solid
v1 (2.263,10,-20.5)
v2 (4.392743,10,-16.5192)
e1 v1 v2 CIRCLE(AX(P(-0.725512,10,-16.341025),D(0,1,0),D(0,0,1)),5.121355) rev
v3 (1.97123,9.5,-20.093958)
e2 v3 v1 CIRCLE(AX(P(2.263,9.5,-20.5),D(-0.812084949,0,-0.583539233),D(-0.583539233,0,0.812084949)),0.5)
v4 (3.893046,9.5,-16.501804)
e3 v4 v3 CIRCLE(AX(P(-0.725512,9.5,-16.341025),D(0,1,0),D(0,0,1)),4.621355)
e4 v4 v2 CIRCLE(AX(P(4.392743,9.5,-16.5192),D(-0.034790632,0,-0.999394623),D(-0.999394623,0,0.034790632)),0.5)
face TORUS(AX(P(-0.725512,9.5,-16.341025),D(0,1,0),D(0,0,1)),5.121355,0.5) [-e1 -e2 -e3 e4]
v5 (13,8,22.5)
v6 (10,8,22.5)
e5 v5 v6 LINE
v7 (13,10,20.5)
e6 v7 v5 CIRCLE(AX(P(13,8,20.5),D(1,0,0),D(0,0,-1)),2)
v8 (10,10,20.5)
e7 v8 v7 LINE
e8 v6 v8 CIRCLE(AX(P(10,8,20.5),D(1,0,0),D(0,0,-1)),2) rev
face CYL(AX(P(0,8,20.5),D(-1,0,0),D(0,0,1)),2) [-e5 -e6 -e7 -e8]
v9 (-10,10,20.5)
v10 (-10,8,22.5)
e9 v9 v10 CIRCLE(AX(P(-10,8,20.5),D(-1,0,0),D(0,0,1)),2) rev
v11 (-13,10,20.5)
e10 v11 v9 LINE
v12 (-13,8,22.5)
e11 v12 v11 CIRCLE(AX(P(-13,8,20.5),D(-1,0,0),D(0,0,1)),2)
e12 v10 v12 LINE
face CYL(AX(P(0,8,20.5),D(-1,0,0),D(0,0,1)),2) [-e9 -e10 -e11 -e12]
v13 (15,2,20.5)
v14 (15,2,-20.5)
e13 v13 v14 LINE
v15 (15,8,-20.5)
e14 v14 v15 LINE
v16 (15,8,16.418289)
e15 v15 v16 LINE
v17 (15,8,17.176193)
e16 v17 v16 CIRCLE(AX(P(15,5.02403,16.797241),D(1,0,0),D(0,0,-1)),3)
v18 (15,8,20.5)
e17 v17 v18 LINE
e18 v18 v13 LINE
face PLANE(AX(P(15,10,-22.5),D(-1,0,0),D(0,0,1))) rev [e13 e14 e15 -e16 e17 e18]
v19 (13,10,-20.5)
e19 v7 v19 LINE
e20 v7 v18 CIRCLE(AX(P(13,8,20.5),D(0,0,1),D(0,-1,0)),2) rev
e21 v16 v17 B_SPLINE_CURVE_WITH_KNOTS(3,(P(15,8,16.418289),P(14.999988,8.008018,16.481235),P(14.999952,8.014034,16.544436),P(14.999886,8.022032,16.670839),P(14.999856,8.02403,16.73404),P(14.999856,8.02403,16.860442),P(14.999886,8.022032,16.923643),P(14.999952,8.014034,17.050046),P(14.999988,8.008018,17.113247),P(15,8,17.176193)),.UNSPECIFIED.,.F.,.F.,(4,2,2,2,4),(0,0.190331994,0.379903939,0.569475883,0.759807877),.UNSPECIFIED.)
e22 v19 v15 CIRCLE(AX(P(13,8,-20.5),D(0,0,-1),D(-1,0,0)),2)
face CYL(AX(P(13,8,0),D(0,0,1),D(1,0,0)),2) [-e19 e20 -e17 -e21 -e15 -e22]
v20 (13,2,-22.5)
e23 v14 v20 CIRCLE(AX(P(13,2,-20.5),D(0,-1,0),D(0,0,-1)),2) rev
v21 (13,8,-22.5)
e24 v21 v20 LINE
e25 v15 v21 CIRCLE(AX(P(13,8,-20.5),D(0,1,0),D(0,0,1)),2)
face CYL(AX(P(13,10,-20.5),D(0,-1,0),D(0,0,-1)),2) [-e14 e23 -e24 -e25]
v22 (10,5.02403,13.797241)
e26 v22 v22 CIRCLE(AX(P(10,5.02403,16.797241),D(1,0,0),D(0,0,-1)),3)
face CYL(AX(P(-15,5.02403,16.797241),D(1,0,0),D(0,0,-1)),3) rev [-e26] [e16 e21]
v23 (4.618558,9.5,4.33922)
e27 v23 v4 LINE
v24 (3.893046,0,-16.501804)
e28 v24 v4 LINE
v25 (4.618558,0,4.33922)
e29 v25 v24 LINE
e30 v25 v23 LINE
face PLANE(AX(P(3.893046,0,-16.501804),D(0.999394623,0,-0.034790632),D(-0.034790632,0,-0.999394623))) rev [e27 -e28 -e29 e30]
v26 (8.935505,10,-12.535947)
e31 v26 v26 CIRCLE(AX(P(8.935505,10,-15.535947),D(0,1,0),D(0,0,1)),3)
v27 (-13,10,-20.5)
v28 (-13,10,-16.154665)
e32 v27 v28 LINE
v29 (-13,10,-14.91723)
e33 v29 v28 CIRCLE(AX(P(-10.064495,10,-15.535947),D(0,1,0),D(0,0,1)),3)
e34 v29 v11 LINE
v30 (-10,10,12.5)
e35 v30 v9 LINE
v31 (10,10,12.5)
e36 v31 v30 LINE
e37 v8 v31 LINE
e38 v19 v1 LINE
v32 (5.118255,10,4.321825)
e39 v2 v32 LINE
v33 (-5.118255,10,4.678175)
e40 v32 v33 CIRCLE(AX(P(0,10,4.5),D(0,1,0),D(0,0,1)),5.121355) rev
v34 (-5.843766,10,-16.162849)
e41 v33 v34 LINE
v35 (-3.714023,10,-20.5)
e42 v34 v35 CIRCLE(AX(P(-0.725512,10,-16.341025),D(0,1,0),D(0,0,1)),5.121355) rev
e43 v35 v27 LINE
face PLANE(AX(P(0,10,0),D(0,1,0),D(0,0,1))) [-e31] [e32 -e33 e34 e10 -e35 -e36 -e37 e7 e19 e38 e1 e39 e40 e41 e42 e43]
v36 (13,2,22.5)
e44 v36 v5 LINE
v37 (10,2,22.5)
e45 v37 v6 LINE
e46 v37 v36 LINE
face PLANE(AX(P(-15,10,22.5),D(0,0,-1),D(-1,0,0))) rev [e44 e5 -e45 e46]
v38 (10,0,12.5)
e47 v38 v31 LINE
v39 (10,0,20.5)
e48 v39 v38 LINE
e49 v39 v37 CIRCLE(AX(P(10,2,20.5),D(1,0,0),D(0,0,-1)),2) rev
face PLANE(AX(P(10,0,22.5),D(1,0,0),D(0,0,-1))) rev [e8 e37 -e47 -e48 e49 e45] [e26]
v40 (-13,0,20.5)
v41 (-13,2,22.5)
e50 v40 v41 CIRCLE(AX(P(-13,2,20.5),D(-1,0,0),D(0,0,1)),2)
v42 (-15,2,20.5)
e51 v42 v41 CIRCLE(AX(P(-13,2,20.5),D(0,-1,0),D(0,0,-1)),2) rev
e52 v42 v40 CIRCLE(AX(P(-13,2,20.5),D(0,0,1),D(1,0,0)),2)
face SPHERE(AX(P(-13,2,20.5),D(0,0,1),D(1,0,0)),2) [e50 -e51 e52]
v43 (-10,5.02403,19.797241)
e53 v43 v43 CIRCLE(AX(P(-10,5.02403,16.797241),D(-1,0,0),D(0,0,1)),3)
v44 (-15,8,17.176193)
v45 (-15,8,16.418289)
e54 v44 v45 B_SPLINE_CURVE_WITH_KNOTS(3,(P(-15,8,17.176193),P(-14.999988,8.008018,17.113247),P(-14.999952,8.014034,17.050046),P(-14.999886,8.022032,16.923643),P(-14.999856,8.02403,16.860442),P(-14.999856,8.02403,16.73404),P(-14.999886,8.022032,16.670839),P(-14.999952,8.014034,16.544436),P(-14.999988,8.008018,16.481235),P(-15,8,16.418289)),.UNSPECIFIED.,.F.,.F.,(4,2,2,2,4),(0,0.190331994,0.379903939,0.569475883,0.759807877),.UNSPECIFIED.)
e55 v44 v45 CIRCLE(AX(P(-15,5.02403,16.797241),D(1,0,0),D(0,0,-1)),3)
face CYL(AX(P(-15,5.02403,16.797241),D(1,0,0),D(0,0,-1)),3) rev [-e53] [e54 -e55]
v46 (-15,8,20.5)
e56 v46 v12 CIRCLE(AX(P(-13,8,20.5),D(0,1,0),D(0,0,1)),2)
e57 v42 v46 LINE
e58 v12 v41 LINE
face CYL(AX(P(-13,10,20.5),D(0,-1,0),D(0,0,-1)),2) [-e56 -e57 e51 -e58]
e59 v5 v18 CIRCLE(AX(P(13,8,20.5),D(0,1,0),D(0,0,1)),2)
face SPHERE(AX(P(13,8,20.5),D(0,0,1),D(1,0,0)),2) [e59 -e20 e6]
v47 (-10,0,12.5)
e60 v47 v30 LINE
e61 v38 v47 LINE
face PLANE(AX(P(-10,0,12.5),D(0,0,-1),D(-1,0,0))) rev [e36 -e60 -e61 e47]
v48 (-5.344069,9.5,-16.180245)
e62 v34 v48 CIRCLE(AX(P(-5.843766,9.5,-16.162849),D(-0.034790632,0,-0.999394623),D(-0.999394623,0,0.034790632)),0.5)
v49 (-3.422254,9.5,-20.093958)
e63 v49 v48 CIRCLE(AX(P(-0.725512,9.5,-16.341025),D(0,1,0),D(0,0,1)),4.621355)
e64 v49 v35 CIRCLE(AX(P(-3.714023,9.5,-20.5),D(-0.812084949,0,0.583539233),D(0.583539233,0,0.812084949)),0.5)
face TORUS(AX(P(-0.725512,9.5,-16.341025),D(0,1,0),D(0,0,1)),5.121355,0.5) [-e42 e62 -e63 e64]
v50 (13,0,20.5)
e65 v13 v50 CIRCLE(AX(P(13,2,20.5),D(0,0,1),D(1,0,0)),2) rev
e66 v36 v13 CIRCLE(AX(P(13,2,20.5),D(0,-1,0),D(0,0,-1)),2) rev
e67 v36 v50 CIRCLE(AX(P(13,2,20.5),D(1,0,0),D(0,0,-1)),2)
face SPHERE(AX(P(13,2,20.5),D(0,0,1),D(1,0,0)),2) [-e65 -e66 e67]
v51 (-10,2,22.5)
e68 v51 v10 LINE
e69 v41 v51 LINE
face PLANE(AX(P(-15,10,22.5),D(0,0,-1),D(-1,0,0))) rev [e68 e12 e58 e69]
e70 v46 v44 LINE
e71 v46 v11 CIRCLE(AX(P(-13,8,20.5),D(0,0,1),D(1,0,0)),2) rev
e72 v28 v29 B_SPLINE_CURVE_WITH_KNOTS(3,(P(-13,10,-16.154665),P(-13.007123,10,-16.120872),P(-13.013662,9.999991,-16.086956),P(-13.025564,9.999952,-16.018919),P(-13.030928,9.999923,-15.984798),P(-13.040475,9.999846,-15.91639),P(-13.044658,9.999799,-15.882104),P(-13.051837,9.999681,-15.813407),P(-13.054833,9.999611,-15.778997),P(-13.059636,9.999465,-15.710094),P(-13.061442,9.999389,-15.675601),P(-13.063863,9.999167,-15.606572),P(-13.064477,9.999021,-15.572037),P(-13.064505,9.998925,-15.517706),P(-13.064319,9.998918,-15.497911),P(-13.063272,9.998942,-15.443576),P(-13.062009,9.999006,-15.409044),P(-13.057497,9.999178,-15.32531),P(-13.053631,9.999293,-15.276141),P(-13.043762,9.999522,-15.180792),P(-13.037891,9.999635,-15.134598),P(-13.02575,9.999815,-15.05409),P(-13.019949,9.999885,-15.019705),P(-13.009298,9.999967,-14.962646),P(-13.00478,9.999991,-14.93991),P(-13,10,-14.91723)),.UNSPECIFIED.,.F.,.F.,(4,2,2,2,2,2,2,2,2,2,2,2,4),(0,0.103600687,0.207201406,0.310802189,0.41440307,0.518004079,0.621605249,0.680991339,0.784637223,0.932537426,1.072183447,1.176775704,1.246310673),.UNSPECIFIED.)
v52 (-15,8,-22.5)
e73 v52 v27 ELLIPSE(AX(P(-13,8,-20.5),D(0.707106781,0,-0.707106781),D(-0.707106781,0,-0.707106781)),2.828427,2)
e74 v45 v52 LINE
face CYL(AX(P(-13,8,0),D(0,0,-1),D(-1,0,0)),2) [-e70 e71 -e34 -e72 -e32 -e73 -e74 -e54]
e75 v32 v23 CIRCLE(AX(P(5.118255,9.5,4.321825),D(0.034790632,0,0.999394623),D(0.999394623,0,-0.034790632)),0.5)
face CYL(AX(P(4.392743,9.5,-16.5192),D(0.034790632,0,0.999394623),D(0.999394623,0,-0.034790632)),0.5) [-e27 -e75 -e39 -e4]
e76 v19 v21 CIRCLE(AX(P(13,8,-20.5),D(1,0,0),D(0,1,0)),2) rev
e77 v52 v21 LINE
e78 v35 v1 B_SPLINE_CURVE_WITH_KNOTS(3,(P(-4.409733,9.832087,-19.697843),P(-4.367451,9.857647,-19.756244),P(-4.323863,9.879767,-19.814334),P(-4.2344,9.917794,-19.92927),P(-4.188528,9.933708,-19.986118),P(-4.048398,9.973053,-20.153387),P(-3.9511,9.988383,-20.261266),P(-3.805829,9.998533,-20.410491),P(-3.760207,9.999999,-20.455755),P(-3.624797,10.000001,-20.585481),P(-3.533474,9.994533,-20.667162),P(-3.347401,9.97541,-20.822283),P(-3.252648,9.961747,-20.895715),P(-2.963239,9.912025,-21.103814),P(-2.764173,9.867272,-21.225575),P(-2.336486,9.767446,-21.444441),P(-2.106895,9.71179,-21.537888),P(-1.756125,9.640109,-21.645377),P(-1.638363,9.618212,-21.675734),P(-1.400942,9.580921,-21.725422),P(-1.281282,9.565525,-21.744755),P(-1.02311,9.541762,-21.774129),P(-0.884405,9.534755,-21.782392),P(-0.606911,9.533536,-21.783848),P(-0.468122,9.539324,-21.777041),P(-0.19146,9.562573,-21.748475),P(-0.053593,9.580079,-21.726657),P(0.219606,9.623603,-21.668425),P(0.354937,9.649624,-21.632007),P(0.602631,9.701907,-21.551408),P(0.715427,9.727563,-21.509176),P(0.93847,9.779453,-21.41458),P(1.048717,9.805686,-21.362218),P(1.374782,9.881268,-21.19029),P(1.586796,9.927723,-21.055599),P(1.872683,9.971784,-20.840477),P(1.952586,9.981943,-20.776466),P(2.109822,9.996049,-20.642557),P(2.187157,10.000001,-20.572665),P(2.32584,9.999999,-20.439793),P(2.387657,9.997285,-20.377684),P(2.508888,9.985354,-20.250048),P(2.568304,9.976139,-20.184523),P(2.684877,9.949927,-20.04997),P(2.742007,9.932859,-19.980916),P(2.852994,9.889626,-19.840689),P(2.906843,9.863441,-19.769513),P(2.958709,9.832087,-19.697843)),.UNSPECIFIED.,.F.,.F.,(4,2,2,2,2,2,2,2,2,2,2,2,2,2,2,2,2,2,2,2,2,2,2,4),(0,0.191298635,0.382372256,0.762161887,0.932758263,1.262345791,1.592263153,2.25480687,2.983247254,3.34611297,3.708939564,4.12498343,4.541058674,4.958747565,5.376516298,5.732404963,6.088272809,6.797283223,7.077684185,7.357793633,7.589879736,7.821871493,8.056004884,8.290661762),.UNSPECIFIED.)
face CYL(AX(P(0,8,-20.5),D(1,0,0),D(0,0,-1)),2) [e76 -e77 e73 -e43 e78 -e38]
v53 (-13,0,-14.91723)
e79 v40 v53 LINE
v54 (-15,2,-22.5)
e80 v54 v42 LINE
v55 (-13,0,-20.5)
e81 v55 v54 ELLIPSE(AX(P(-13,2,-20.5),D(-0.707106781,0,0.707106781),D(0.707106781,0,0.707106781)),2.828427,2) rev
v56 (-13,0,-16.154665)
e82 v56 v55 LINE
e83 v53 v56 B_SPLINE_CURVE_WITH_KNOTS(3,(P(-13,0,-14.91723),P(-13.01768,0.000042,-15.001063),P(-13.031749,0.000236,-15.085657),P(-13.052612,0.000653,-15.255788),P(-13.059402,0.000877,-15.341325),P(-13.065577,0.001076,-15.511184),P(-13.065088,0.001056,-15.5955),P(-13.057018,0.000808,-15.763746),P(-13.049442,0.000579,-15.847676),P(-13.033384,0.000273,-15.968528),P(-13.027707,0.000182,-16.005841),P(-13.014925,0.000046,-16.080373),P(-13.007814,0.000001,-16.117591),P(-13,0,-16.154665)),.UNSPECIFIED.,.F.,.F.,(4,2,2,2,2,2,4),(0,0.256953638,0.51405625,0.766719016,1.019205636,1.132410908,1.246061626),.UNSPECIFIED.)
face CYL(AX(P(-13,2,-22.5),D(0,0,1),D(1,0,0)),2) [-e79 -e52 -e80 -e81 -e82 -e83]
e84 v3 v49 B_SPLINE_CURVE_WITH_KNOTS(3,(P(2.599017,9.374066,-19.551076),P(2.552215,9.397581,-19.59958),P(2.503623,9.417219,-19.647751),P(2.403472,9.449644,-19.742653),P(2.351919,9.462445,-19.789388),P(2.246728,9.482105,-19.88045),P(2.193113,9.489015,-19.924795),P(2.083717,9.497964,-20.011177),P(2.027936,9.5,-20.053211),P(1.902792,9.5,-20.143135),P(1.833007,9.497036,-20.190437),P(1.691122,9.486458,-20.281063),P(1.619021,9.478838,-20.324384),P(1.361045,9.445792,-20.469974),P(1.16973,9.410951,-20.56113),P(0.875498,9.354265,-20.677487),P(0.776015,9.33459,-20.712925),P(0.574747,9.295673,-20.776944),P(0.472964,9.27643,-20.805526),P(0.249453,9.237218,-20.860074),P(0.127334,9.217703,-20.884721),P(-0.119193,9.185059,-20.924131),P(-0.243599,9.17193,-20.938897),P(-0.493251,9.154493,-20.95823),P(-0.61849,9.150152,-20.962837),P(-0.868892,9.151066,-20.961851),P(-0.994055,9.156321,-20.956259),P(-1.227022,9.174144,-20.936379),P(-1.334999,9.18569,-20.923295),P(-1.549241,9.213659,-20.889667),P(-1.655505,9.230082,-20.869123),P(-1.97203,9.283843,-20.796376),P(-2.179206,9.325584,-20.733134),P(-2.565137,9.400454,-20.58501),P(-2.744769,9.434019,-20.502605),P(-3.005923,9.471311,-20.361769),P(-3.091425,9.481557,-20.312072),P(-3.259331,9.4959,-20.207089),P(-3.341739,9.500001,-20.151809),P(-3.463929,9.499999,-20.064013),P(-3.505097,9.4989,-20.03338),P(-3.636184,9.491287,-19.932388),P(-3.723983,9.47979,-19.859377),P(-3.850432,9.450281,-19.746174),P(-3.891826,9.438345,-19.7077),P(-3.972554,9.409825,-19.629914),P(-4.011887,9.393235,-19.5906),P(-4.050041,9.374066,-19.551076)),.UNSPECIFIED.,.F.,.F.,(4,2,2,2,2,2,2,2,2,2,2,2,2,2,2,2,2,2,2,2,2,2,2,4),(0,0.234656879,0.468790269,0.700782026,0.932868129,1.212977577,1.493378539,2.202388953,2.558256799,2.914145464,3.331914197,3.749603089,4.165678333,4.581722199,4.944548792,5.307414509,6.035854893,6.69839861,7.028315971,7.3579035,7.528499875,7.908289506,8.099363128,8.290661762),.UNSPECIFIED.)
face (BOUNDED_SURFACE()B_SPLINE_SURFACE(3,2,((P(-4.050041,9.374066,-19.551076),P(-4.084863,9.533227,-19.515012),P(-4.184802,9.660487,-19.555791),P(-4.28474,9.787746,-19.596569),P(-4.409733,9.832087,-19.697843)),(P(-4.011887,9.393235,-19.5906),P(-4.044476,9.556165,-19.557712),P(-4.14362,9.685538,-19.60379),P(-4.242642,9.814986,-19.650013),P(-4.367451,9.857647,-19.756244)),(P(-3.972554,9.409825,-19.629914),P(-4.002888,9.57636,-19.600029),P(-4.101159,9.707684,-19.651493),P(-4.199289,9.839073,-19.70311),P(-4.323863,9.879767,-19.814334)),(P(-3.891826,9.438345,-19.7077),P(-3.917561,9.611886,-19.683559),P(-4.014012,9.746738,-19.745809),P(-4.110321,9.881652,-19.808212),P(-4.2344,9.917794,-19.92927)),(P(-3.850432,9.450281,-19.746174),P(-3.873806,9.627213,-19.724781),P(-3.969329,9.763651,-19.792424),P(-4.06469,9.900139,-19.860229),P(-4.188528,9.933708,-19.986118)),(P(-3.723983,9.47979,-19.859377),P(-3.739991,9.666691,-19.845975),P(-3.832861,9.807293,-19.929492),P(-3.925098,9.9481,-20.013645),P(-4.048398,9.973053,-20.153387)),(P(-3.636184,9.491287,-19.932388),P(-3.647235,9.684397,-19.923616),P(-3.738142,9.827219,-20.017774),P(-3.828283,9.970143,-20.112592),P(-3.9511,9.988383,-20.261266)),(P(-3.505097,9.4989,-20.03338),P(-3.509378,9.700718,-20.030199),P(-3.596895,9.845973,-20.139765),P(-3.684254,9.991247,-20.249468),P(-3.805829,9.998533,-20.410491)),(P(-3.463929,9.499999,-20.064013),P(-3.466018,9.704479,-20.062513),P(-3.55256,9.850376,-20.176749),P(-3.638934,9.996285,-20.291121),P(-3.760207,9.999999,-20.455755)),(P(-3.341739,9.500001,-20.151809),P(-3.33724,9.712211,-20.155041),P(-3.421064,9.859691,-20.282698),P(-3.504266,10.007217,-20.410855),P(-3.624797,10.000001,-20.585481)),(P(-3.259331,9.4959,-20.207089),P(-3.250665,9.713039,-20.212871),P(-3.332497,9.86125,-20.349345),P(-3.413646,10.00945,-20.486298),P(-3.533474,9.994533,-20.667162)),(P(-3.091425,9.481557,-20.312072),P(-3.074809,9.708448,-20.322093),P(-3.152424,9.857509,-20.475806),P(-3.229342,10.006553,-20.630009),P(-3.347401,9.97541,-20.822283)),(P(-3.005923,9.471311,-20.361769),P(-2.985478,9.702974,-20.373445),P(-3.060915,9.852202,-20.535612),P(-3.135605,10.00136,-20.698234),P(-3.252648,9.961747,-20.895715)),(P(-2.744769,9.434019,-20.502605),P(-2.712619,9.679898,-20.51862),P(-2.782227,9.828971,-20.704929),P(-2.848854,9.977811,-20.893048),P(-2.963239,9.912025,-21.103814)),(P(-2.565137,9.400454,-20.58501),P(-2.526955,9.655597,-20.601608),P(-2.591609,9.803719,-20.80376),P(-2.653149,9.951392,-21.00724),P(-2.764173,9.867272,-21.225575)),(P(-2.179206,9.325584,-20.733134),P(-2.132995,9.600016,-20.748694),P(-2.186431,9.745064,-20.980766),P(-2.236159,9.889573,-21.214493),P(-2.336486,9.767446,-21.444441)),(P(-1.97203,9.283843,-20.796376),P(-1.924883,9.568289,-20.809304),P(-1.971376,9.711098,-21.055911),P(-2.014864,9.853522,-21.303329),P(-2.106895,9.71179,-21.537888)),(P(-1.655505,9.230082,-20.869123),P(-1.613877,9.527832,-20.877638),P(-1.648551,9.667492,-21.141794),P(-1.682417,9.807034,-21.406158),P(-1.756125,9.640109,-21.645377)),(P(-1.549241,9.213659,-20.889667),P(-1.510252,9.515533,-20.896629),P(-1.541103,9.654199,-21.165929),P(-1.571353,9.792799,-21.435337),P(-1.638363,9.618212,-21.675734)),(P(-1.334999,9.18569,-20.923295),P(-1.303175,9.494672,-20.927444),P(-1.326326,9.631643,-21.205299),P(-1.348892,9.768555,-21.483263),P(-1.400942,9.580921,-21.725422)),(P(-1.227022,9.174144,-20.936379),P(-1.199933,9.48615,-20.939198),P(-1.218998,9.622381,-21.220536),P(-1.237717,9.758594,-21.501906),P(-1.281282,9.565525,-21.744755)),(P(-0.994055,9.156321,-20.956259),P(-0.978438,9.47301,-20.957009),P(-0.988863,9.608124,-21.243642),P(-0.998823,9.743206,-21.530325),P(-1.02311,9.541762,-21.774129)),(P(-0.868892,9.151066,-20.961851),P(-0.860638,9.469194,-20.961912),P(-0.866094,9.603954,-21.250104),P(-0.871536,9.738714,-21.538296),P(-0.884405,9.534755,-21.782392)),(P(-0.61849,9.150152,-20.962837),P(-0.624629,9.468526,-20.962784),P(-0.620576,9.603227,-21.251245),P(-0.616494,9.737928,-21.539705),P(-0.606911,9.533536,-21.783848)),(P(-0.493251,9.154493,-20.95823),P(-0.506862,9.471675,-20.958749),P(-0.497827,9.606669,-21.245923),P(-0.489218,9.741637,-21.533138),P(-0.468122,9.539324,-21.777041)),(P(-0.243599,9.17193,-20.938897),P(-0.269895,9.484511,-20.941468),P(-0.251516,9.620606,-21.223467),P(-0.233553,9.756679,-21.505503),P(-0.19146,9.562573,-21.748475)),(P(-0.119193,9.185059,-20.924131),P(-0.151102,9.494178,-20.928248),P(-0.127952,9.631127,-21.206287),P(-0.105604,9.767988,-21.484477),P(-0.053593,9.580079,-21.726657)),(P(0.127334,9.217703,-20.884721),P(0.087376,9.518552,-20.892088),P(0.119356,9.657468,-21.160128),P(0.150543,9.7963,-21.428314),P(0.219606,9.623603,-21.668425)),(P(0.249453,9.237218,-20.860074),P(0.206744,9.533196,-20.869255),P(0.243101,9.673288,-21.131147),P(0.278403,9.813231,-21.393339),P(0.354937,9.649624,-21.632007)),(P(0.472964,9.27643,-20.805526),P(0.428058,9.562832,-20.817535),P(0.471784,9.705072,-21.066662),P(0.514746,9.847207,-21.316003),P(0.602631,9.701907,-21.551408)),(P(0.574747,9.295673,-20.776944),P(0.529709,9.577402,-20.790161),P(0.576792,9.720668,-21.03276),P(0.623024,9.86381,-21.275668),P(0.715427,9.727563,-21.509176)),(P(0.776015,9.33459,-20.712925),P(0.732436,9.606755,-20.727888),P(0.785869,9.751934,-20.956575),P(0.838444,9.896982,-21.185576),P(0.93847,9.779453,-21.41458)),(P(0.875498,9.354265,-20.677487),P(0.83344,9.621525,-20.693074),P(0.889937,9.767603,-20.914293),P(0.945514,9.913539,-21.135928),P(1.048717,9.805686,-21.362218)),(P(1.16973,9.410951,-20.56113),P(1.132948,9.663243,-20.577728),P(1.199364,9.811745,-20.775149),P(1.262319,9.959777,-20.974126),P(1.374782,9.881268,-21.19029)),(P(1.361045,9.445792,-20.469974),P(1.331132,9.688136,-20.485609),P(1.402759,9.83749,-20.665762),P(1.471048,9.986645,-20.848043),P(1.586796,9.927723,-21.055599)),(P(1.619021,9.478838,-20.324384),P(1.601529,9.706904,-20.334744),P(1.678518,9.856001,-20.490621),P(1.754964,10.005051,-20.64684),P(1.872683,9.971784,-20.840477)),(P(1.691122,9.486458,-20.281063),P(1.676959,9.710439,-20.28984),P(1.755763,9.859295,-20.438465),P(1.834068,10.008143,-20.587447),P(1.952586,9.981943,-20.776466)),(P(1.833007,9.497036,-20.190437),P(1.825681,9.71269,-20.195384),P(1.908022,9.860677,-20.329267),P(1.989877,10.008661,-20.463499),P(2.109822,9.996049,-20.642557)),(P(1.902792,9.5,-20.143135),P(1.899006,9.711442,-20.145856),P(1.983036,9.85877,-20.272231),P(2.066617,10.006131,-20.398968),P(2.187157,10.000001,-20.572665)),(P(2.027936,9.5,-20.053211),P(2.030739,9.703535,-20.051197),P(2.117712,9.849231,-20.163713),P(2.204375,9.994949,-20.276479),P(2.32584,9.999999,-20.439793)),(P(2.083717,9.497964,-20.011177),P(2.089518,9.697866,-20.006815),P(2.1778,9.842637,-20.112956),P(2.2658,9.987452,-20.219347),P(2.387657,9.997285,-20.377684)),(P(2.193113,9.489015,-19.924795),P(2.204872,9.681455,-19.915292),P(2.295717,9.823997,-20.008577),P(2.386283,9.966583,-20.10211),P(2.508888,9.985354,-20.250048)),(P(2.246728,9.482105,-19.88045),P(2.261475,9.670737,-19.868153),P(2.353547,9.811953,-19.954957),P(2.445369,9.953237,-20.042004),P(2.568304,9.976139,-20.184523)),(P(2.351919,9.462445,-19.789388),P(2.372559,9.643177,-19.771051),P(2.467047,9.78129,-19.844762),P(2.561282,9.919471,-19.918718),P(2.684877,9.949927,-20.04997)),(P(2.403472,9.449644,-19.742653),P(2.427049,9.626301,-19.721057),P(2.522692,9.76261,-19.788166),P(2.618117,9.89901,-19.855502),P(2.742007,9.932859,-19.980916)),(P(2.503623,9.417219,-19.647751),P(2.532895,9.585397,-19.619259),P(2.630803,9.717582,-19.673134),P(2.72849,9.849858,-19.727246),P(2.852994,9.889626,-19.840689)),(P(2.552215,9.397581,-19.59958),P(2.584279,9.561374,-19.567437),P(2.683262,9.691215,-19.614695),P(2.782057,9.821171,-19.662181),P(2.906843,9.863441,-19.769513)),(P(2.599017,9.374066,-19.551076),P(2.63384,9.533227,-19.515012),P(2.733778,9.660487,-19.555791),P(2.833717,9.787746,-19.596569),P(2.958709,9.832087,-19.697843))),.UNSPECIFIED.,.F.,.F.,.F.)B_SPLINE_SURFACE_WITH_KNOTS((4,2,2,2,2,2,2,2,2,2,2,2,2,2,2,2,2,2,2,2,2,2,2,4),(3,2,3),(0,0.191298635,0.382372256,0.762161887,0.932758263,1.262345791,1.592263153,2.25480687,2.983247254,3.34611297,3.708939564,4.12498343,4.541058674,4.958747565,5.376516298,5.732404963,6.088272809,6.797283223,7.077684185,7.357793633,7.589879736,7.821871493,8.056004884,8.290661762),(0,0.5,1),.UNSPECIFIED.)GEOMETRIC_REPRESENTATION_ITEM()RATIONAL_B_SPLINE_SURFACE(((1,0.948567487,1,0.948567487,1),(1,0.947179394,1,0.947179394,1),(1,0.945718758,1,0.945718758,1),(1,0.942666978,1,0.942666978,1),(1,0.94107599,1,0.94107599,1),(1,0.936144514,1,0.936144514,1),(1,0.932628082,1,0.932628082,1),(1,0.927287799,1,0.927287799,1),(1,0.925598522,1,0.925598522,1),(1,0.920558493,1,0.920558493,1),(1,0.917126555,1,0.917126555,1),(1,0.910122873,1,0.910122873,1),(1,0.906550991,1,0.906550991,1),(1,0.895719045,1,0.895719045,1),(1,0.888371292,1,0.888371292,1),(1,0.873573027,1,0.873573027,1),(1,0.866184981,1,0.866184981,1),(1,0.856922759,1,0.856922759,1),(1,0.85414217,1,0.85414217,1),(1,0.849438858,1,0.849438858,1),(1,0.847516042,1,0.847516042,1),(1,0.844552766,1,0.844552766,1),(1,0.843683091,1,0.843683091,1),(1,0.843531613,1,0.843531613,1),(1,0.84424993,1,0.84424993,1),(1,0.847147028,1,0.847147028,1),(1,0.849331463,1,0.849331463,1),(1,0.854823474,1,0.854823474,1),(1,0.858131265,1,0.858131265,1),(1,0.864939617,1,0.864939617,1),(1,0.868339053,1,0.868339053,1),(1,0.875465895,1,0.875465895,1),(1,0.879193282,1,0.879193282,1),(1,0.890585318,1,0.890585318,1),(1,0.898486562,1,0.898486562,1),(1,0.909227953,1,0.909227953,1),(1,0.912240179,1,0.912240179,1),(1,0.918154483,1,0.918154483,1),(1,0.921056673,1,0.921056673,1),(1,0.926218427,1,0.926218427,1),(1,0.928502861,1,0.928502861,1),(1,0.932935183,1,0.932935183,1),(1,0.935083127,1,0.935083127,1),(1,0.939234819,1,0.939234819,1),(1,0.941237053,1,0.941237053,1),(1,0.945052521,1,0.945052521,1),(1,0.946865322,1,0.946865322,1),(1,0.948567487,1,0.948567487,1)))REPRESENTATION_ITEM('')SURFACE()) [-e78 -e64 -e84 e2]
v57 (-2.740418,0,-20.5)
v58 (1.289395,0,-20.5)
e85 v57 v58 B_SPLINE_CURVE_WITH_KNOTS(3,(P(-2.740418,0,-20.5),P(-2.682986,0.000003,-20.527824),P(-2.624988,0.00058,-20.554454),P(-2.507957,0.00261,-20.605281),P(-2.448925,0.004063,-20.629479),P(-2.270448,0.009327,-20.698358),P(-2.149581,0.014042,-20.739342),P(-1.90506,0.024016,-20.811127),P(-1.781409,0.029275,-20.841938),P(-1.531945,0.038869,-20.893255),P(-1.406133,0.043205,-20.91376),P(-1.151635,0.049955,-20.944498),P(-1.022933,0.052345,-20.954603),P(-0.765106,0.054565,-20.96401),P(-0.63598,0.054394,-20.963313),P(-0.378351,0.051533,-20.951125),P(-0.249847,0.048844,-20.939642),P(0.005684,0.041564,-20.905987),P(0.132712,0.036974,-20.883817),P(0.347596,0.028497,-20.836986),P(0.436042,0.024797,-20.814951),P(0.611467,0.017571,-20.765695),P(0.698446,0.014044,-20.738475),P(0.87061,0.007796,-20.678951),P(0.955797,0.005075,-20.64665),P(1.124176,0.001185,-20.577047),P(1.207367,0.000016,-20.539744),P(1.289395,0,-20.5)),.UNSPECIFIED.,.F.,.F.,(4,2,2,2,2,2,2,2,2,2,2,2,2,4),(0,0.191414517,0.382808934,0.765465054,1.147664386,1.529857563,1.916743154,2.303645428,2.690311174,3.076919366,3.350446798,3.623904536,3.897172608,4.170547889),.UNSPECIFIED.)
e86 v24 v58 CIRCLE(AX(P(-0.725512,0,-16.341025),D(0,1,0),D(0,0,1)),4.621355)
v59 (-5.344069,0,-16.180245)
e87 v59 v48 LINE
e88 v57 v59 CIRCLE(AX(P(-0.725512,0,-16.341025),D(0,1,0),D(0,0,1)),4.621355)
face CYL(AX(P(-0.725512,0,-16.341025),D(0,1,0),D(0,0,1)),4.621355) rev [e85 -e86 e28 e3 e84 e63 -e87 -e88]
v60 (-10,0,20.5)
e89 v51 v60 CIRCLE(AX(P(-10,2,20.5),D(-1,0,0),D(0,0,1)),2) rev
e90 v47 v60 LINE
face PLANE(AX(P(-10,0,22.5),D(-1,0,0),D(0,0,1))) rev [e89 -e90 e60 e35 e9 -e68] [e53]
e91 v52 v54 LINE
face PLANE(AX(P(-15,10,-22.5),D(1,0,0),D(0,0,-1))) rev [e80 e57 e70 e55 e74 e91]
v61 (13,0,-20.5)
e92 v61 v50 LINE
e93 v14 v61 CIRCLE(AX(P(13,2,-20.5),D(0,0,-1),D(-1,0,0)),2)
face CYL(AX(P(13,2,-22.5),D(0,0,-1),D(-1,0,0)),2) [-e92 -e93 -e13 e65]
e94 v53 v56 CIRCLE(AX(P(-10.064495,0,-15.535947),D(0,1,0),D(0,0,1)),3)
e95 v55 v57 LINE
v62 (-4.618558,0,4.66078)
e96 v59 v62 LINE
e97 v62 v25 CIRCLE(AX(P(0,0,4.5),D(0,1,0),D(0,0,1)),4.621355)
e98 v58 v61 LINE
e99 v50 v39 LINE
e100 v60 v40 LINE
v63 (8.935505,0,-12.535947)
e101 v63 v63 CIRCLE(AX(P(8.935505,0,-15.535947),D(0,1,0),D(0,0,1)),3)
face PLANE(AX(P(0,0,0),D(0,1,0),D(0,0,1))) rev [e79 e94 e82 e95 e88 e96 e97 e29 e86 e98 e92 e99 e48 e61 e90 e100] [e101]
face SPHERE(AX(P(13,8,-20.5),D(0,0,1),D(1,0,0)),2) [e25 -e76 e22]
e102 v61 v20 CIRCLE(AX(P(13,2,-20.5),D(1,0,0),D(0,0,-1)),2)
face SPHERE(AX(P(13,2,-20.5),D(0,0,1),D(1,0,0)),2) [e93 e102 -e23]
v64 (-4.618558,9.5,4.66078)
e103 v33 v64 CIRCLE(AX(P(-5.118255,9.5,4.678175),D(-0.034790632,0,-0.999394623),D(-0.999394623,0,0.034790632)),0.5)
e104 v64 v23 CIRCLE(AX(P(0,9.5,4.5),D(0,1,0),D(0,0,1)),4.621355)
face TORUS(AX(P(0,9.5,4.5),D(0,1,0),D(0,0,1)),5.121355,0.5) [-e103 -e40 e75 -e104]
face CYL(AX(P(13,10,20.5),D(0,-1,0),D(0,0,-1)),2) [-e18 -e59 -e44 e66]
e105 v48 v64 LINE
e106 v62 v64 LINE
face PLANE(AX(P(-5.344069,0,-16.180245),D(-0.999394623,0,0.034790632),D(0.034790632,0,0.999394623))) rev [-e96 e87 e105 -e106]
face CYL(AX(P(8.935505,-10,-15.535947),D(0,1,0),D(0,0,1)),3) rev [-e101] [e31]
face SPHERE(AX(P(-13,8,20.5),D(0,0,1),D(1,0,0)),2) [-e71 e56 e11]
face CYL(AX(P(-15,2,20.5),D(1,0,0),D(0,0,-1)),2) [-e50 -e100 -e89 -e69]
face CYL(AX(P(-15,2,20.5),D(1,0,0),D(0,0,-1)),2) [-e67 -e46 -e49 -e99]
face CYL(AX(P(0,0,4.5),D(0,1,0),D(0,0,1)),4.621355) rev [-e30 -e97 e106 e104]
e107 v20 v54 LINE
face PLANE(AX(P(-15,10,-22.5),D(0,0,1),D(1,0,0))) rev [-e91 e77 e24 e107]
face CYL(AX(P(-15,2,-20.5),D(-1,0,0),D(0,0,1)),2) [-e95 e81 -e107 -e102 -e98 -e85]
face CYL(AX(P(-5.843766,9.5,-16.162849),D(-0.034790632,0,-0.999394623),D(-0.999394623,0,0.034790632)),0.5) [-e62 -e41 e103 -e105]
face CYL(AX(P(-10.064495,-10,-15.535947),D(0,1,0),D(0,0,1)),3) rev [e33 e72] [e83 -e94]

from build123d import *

# Parameters (mm, degrees)
SKETCH1_W           = 30
SKETCH1_H           = 45
BOSS_EXTRUDE1_DEPTH = 10
SKETCH2_W           = 20
SKETCH2_H           = 10
CUT_EXTRUDE1_DEPTH  = 29.831406487
FILLET1_R           = 2
FILLET3_R           = 0.5
SKETCH3_R           = 3
CUT_EXTRUDE2_DEPTH  = 39.810436902
SKETCH4_R           = 3
CUT_EXTRUDE3_DEPTH  = 20


with BuildPart() as part:
    # Sketch1 → Boss-Extrude1 (new body)
    with BuildSketch(Plane(origin=(0, 0, 0), x_dir=(1, 0, 0), z_dir=(0, 1, 0))):
        Rectangle(SKETCH1_W, SKETCH1_H)
    extrude(amount=BOSS_EXTRUDE1_DEPTH)

    # Sketch2 → Cut-Extrude1 (cut, through all)
    with BuildSketch(Plane(origin=(0, 10, 0), x_dir=(1, 0, 0), z_dir=(0, 1, 0))):
        with BuildLine():
            Line((3.893045877, 16.501804419), (4.618557503, -4.339220132))
            ThreePointArc((4.618557503, -4.339220132), (0.160779868, -9.118557503), (-4.618557503, -4.660779868))
            Line((-4.618557503, -4.660779868), (-5.34406913, 16.180244684))
            ThreePointArc((-5.34406913, 16.180244684), (-0.886291494, 20.959582055), (3.893045877, 16.501804419))
        make_face()
        with Locations((0, -17.5)):
            Rectangle(SKETCH2_W, SKETCH2_H)
    extrude(amount=-CUT_EXTRUDE1_DEPTH, mode=Mode.SUBTRACT)

    # Fillet1
    # the kernel refuses this fillet: 2 mm, written as the material it takes off along each edge
    with BuildSketch(Plane(origin=(-13, 8, 20.5), x_dir=(0, 1, 0), z_dir=(-1, 0, 0))) as fillet1_piece_1_section:
        Polygon((0, 0), (FILLET1_R, 0), (FILLET1_R, -FILLET1_R), (0, -FILLET1_R), align=None)
    fillet1_piece_1 = extrude(amount=FILLET1_R, mode=Mode.PRIVATE)
    fillet1_piece_1 = fillet1_piece_1 - Plane(origin=(-13, 8, 20.5), x_dir=(0, -0.7071067811865475, -0.7071067811865475), z_dir=(-1, 0, 0)) * Sphere(FILLET1_R, mode=Mode.PRIVATE)
    add(fillet1_piece_1, mode=Mode.SUBTRACT)
    with BuildSketch(Plane(origin=(13, 2, 20.5), x_dir=(0, -1, 0), z_dir=(1, 0, 0))) as fillet1_piece_2_section:
        Polygon((0, 0), (FILLET1_R, 0), (FILLET1_R, -FILLET1_R), (0, -FILLET1_R), align=None)
    fillet1_piece_2 = extrude(amount=FILLET1_R, mode=Mode.PRIVATE)
    fillet1_piece_2 = fillet1_piece_2 - Plane(origin=(13, 2, 20.5), x_dir=(0, 0.7071067811865475, -0.7071067811865475), z_dir=(1, 0, 0)) * Sphere(FILLET1_R, mode=Mode.PRIVATE)
    add(fillet1_piece_2, mode=Mode.SUBTRACT)
    with BuildSketch(Plane(origin=(13, 8, 20.5), x_dir=(0, 1, 0), z_dir=(1, 0, 0))) as fillet1_piece_3_section:
        Polygon((0, 0), (FILLET1_R, 0), (FILLET1_R, FILLET1_R), (0, FILLET1_R), align=None)
    fillet1_piece_3 = extrude(amount=FILLET1_R, mode=Mode.PRIVATE)
    fillet1_piece_3 = fillet1_piece_3 - Plane(origin=(13, 8, 20.5), x_dir=(0, -0.7071067811865475, -0.7071067811865475), z_dir=(1, 0, 0)) * Sphere(FILLET1_R, mode=Mode.PRIVATE)
    add(fillet1_piece_3, mode=Mode.SUBTRACT)
    with BuildSketch(Plane(origin=(13, 8, -20.5), x_dir=(1, 0, 0), z_dir=(0, 0, -1))) as fillet1_piece_4_section:
        Polygon((0, 0), (FILLET1_R, 0), (FILLET1_R, -FILLET1_R), (0, -FILLET1_R), align=None)
    fillet1_piece_4 = extrude(amount=FILLET1_R, mode=Mode.PRIVATE)
    fillet1_piece_4 = fillet1_piece_4 - Plane(origin=(13, 8, -20.5), x_dir=(-0.7071067811865475, -0.7071067811865475, 0), z_dir=(0, 0, -1)) * Sphere(FILLET1_R, mode=Mode.PRIVATE)
    add(fillet1_piece_4, mode=Mode.SUBTRACT)
    with BuildSketch(Plane(origin=(-13, 2, 20.5), x_dir=(0, -1, 0), z_dir=(-1, 0, 0))) as fillet1_piece_5_section:
        Polygon((0, 0), (FILLET1_R, 0), (FILLET1_R, FILLET1_R), (0, FILLET1_R), align=None)
    fillet1_piece_5 = extrude(amount=FILLET1_R, mode=Mode.PRIVATE)
    fillet1_piece_5 = fillet1_piece_5 - Plane(origin=(-13, 2, 20.5), x_dir=(0, 0.7071067811865475, -0.7071067811865475), z_dir=(-1, 0, 0)) * Sphere(FILLET1_R, mode=Mode.PRIVATE)
    add(fillet1_piece_5, mode=Mode.SUBTRACT)
    with BuildSketch(Plane(origin=(13, 2, -20.5), x_dir=(1, 0, 0), z_dir=(0, 0, -1))) as fillet1_piece_6_section:
        Polygon((0, 0), (FILLET1_R, 0), (FILLET1_R, FILLET1_R), (0, FILLET1_R), align=None)
    fillet1_piece_6 = extrude(amount=FILLET1_R, mode=Mode.PRIVATE)
    fillet1_piece_6 = fillet1_piece_6 - Plane(origin=(13, 2, -20.5), x_dir=(-0.7071067811865475, 0.7071067811865475, 0), z_dir=(0, 0, -1)) * Sphere(FILLET1_R, mode=Mode.PRIVATE)
    add(fillet1_piece_6, mode=Mode.SUBTRACT)
    with BuildSketch(Plane(origin=(-15, 10, 20.5), x_dir=(0, -1, 0), z_dir=(0, 0, -1))) as fillet1_piece_7:
        with BuildLine():
            CenterArc((FILLET1_R, -FILLET1_R), FILLET1_R, 90, 90)
            Line((0, -FILLET1_R), (0, 0))
            Line((0, 0), (FILLET1_R, 0))
        make_face()
    extrude(amount=48, mode=Mode.SUBTRACT)
    with BuildSketch(Plane(origin=(-5, 10, 22.5), x_dir=(0, 0, -1), z_dir=(-1, 0, 0)), Plane(origin=(13, 10, 22.5), x_dir=(0, 0, -1), z_dir=(-1, 0, 0))) as fillet1_piece_8:
        with BuildLine():
            CenterArc((FILLET1_R, FILLET1_R), FILLET1_R, 180, 90)
            Line((0, FILLET1_R), (0, 0))
            Line((0, 0), (FILLET1_R, 0))
        make_face()
    extrude(amount=8, mode=Mode.SUBTRACT)
    with BuildSketch(Plane(origin=(13, 0, 22.5), x_dir=(0, 0, -1), z_dir=(-1, 0, 0)), Plane(origin=(-5, 0, 22.5), x_dir=(0, 0, -1), z_dir=(-1, 0, 0))) as fillet1_piece_9:
        with BuildLine():
            CenterArc((FILLET1_R, -FILLET1_R), FILLET1_R, 90, 90)
            Line((0, -FILLET1_R), (0, 0))
            Line((0, 0), (FILLET1_R, 0))
        make_face()
    extrude(amount=8, mode=Mode.SUBTRACT)
    with BuildSketch(Plane(origin=(15, 10, -20.5), x_dir=(0, -1, 0), z_dir=(0, 0, 1))) as fillet1_piece_10:
        with BuildLine():
            CenterArc((FILLET1_R, -FILLET1_R), FILLET1_R, 90, 90)
            Line((0, -FILLET1_R), (0, 0))
            Line((0, 0), (FILLET1_R, 0))
        make_face()
    extrude(amount=41, mode=Mode.SUBTRACT)
    with BuildSketch(Plane(origin=(-15, 0, 20.5), x_dir=(0, 1, 0), z_dir=(0, 0, -1))) as fillet1_piece_11:
        with BuildLine():
            CenterArc((FILLET1_R, FILLET1_R), FILLET1_R, 180, 90)
            Line((0, FILLET1_R), (0, 0))
            Line((0, 0), (FILLET1_R, 0))
        make_face()
    extrude(amount=48, mode=Mode.SUBTRACT)
    with BuildSketch(Plane(origin=(-20, 0, -22.5), x_dir=(0, 1, 0), z_dir=(1, 0, 0))) as fillet1_piece_12:
        with BuildLine():
            CenterArc((FILLET1_R, FILLET1_R), FILLET1_R, 180, 90)
            Line((0, FILLET1_R), (0, 0))
            Line((0, 0), (FILLET1_R, 0))
        make_face()
    extrude(amount=33, mode=Mode.SUBTRACT)
    with BuildSketch(Plane(origin=(15, 0, -20.5), x_dir=(0, 1, 0), z_dir=(0, 0, 1))) as fillet1_piece_13:
        with BuildLine():
            CenterArc((FILLET1_R, FILLET1_R), FILLET1_R, 180, 90)
            Line((0, FILLET1_R), (0, 0))
            Line((0, 0), (FILLET1_R, 0))
        make_face()
    extrude(amount=41, mode=Mode.SUBTRACT)
    with BuildSketch(Plane(origin=(-20, 10, -22.5), x_dir=(0, -1, 0), z_dir=(1, 0, 0))) as fillet1_piece_14:
        with BuildLine():
            CenterArc((FILLET1_R, -FILLET1_R), FILLET1_R, 90, 90)
            Line((0, -FILLET1_R), (0, 0))
            Line((0, 0), (FILLET1_R, 0))
        make_face()
    extrude(amount=33, mode=Mode.SUBTRACT)
    with BuildSketch(Plane(origin=(15, 2, 22.5), x_dir=(0, 0, -1), z_dir=(0, 1, 0)), Plane(origin=(15, 2, -22.5), x_dir=(-1, 0, 0), z_dir=(0, 1, 0))) as fillet1_piece_15:
        with BuildLine():
            CenterArc((FILLET1_R, FILLET1_R), FILLET1_R, 180, 90)
            Line((0, FILLET1_R), (0, 0))
            Line((0, 0), (FILLET1_R, 0))
        make_face()
    extrude(amount=6, mode=Mode.SUBTRACT)
    with BuildSketch(Plane(origin=(-15, 2, 22.5), x_dir=(0, 0, -1), z_dir=(0, 1, 0))) as fillet1_piece_16:
        with BuildLine():
            CenterArc((FILLET1_R, -FILLET1_R), FILLET1_R, 90, 90)
            Line((0, -FILLET1_R), (0, 0))
            Line((0, 0), (FILLET1_R, 0))
        make_face()
    extrude(amount=6, mode=Mode.SUBTRACT)

    # Fillet3
    fillet3_edges = [part.edges().sort_by_distance(p)[0] for p in [
        (3.14709757, 10, -18.862893222),
        (-4.981313317, 10, -5.759732408),
        (0.160779868, 10, 9.118557503),
        (4.25580169, 10, -6.081292143),
        (-4.683513839, 10, -18.726636018),
        (-0.725511627, 9.945817308, -20.962379718),
    ]]
    fillet(fillet3_edges, radius=FILLET3_R)

    # Sketch3 → Cut-Extrude2 (cut, through all)
    with BuildSketch(Plane(origin=(15, 0, 0), x_dir=(0, 0, -1), z_dir=(1, 0, 0))):
        with Locations(Location((-16.797241127, 5.024030388, 0), (0, 0, 82.743157185))):
            Circle(SKETCH3_R)
    extrude(amount=-CUT_EXTRUDE2_DEPTH, mode=Mode.SUBTRACT)

    # Sketch4 → Cut-Extrude3 (cut)
    with BuildSketch(Plane(origin=(0, 10, 0), x_dir=(1, 0, 0), z_dir=(0, 1, 0))):
        with Locations(Location((8.935504807, 15.535947381, 0), (0, 0, 270))):
            Circle(SKETCH4_R)
        with Locations(Location((-10.064495193, 15.535947381, 0), (0, 0, 191.902051239))):
            Circle(SKETCH4_R)
    extrude(amount=-CUT_EXTRUDE3_DEPTH, mode=Mode.SUBTRACT)


solid = part.part
